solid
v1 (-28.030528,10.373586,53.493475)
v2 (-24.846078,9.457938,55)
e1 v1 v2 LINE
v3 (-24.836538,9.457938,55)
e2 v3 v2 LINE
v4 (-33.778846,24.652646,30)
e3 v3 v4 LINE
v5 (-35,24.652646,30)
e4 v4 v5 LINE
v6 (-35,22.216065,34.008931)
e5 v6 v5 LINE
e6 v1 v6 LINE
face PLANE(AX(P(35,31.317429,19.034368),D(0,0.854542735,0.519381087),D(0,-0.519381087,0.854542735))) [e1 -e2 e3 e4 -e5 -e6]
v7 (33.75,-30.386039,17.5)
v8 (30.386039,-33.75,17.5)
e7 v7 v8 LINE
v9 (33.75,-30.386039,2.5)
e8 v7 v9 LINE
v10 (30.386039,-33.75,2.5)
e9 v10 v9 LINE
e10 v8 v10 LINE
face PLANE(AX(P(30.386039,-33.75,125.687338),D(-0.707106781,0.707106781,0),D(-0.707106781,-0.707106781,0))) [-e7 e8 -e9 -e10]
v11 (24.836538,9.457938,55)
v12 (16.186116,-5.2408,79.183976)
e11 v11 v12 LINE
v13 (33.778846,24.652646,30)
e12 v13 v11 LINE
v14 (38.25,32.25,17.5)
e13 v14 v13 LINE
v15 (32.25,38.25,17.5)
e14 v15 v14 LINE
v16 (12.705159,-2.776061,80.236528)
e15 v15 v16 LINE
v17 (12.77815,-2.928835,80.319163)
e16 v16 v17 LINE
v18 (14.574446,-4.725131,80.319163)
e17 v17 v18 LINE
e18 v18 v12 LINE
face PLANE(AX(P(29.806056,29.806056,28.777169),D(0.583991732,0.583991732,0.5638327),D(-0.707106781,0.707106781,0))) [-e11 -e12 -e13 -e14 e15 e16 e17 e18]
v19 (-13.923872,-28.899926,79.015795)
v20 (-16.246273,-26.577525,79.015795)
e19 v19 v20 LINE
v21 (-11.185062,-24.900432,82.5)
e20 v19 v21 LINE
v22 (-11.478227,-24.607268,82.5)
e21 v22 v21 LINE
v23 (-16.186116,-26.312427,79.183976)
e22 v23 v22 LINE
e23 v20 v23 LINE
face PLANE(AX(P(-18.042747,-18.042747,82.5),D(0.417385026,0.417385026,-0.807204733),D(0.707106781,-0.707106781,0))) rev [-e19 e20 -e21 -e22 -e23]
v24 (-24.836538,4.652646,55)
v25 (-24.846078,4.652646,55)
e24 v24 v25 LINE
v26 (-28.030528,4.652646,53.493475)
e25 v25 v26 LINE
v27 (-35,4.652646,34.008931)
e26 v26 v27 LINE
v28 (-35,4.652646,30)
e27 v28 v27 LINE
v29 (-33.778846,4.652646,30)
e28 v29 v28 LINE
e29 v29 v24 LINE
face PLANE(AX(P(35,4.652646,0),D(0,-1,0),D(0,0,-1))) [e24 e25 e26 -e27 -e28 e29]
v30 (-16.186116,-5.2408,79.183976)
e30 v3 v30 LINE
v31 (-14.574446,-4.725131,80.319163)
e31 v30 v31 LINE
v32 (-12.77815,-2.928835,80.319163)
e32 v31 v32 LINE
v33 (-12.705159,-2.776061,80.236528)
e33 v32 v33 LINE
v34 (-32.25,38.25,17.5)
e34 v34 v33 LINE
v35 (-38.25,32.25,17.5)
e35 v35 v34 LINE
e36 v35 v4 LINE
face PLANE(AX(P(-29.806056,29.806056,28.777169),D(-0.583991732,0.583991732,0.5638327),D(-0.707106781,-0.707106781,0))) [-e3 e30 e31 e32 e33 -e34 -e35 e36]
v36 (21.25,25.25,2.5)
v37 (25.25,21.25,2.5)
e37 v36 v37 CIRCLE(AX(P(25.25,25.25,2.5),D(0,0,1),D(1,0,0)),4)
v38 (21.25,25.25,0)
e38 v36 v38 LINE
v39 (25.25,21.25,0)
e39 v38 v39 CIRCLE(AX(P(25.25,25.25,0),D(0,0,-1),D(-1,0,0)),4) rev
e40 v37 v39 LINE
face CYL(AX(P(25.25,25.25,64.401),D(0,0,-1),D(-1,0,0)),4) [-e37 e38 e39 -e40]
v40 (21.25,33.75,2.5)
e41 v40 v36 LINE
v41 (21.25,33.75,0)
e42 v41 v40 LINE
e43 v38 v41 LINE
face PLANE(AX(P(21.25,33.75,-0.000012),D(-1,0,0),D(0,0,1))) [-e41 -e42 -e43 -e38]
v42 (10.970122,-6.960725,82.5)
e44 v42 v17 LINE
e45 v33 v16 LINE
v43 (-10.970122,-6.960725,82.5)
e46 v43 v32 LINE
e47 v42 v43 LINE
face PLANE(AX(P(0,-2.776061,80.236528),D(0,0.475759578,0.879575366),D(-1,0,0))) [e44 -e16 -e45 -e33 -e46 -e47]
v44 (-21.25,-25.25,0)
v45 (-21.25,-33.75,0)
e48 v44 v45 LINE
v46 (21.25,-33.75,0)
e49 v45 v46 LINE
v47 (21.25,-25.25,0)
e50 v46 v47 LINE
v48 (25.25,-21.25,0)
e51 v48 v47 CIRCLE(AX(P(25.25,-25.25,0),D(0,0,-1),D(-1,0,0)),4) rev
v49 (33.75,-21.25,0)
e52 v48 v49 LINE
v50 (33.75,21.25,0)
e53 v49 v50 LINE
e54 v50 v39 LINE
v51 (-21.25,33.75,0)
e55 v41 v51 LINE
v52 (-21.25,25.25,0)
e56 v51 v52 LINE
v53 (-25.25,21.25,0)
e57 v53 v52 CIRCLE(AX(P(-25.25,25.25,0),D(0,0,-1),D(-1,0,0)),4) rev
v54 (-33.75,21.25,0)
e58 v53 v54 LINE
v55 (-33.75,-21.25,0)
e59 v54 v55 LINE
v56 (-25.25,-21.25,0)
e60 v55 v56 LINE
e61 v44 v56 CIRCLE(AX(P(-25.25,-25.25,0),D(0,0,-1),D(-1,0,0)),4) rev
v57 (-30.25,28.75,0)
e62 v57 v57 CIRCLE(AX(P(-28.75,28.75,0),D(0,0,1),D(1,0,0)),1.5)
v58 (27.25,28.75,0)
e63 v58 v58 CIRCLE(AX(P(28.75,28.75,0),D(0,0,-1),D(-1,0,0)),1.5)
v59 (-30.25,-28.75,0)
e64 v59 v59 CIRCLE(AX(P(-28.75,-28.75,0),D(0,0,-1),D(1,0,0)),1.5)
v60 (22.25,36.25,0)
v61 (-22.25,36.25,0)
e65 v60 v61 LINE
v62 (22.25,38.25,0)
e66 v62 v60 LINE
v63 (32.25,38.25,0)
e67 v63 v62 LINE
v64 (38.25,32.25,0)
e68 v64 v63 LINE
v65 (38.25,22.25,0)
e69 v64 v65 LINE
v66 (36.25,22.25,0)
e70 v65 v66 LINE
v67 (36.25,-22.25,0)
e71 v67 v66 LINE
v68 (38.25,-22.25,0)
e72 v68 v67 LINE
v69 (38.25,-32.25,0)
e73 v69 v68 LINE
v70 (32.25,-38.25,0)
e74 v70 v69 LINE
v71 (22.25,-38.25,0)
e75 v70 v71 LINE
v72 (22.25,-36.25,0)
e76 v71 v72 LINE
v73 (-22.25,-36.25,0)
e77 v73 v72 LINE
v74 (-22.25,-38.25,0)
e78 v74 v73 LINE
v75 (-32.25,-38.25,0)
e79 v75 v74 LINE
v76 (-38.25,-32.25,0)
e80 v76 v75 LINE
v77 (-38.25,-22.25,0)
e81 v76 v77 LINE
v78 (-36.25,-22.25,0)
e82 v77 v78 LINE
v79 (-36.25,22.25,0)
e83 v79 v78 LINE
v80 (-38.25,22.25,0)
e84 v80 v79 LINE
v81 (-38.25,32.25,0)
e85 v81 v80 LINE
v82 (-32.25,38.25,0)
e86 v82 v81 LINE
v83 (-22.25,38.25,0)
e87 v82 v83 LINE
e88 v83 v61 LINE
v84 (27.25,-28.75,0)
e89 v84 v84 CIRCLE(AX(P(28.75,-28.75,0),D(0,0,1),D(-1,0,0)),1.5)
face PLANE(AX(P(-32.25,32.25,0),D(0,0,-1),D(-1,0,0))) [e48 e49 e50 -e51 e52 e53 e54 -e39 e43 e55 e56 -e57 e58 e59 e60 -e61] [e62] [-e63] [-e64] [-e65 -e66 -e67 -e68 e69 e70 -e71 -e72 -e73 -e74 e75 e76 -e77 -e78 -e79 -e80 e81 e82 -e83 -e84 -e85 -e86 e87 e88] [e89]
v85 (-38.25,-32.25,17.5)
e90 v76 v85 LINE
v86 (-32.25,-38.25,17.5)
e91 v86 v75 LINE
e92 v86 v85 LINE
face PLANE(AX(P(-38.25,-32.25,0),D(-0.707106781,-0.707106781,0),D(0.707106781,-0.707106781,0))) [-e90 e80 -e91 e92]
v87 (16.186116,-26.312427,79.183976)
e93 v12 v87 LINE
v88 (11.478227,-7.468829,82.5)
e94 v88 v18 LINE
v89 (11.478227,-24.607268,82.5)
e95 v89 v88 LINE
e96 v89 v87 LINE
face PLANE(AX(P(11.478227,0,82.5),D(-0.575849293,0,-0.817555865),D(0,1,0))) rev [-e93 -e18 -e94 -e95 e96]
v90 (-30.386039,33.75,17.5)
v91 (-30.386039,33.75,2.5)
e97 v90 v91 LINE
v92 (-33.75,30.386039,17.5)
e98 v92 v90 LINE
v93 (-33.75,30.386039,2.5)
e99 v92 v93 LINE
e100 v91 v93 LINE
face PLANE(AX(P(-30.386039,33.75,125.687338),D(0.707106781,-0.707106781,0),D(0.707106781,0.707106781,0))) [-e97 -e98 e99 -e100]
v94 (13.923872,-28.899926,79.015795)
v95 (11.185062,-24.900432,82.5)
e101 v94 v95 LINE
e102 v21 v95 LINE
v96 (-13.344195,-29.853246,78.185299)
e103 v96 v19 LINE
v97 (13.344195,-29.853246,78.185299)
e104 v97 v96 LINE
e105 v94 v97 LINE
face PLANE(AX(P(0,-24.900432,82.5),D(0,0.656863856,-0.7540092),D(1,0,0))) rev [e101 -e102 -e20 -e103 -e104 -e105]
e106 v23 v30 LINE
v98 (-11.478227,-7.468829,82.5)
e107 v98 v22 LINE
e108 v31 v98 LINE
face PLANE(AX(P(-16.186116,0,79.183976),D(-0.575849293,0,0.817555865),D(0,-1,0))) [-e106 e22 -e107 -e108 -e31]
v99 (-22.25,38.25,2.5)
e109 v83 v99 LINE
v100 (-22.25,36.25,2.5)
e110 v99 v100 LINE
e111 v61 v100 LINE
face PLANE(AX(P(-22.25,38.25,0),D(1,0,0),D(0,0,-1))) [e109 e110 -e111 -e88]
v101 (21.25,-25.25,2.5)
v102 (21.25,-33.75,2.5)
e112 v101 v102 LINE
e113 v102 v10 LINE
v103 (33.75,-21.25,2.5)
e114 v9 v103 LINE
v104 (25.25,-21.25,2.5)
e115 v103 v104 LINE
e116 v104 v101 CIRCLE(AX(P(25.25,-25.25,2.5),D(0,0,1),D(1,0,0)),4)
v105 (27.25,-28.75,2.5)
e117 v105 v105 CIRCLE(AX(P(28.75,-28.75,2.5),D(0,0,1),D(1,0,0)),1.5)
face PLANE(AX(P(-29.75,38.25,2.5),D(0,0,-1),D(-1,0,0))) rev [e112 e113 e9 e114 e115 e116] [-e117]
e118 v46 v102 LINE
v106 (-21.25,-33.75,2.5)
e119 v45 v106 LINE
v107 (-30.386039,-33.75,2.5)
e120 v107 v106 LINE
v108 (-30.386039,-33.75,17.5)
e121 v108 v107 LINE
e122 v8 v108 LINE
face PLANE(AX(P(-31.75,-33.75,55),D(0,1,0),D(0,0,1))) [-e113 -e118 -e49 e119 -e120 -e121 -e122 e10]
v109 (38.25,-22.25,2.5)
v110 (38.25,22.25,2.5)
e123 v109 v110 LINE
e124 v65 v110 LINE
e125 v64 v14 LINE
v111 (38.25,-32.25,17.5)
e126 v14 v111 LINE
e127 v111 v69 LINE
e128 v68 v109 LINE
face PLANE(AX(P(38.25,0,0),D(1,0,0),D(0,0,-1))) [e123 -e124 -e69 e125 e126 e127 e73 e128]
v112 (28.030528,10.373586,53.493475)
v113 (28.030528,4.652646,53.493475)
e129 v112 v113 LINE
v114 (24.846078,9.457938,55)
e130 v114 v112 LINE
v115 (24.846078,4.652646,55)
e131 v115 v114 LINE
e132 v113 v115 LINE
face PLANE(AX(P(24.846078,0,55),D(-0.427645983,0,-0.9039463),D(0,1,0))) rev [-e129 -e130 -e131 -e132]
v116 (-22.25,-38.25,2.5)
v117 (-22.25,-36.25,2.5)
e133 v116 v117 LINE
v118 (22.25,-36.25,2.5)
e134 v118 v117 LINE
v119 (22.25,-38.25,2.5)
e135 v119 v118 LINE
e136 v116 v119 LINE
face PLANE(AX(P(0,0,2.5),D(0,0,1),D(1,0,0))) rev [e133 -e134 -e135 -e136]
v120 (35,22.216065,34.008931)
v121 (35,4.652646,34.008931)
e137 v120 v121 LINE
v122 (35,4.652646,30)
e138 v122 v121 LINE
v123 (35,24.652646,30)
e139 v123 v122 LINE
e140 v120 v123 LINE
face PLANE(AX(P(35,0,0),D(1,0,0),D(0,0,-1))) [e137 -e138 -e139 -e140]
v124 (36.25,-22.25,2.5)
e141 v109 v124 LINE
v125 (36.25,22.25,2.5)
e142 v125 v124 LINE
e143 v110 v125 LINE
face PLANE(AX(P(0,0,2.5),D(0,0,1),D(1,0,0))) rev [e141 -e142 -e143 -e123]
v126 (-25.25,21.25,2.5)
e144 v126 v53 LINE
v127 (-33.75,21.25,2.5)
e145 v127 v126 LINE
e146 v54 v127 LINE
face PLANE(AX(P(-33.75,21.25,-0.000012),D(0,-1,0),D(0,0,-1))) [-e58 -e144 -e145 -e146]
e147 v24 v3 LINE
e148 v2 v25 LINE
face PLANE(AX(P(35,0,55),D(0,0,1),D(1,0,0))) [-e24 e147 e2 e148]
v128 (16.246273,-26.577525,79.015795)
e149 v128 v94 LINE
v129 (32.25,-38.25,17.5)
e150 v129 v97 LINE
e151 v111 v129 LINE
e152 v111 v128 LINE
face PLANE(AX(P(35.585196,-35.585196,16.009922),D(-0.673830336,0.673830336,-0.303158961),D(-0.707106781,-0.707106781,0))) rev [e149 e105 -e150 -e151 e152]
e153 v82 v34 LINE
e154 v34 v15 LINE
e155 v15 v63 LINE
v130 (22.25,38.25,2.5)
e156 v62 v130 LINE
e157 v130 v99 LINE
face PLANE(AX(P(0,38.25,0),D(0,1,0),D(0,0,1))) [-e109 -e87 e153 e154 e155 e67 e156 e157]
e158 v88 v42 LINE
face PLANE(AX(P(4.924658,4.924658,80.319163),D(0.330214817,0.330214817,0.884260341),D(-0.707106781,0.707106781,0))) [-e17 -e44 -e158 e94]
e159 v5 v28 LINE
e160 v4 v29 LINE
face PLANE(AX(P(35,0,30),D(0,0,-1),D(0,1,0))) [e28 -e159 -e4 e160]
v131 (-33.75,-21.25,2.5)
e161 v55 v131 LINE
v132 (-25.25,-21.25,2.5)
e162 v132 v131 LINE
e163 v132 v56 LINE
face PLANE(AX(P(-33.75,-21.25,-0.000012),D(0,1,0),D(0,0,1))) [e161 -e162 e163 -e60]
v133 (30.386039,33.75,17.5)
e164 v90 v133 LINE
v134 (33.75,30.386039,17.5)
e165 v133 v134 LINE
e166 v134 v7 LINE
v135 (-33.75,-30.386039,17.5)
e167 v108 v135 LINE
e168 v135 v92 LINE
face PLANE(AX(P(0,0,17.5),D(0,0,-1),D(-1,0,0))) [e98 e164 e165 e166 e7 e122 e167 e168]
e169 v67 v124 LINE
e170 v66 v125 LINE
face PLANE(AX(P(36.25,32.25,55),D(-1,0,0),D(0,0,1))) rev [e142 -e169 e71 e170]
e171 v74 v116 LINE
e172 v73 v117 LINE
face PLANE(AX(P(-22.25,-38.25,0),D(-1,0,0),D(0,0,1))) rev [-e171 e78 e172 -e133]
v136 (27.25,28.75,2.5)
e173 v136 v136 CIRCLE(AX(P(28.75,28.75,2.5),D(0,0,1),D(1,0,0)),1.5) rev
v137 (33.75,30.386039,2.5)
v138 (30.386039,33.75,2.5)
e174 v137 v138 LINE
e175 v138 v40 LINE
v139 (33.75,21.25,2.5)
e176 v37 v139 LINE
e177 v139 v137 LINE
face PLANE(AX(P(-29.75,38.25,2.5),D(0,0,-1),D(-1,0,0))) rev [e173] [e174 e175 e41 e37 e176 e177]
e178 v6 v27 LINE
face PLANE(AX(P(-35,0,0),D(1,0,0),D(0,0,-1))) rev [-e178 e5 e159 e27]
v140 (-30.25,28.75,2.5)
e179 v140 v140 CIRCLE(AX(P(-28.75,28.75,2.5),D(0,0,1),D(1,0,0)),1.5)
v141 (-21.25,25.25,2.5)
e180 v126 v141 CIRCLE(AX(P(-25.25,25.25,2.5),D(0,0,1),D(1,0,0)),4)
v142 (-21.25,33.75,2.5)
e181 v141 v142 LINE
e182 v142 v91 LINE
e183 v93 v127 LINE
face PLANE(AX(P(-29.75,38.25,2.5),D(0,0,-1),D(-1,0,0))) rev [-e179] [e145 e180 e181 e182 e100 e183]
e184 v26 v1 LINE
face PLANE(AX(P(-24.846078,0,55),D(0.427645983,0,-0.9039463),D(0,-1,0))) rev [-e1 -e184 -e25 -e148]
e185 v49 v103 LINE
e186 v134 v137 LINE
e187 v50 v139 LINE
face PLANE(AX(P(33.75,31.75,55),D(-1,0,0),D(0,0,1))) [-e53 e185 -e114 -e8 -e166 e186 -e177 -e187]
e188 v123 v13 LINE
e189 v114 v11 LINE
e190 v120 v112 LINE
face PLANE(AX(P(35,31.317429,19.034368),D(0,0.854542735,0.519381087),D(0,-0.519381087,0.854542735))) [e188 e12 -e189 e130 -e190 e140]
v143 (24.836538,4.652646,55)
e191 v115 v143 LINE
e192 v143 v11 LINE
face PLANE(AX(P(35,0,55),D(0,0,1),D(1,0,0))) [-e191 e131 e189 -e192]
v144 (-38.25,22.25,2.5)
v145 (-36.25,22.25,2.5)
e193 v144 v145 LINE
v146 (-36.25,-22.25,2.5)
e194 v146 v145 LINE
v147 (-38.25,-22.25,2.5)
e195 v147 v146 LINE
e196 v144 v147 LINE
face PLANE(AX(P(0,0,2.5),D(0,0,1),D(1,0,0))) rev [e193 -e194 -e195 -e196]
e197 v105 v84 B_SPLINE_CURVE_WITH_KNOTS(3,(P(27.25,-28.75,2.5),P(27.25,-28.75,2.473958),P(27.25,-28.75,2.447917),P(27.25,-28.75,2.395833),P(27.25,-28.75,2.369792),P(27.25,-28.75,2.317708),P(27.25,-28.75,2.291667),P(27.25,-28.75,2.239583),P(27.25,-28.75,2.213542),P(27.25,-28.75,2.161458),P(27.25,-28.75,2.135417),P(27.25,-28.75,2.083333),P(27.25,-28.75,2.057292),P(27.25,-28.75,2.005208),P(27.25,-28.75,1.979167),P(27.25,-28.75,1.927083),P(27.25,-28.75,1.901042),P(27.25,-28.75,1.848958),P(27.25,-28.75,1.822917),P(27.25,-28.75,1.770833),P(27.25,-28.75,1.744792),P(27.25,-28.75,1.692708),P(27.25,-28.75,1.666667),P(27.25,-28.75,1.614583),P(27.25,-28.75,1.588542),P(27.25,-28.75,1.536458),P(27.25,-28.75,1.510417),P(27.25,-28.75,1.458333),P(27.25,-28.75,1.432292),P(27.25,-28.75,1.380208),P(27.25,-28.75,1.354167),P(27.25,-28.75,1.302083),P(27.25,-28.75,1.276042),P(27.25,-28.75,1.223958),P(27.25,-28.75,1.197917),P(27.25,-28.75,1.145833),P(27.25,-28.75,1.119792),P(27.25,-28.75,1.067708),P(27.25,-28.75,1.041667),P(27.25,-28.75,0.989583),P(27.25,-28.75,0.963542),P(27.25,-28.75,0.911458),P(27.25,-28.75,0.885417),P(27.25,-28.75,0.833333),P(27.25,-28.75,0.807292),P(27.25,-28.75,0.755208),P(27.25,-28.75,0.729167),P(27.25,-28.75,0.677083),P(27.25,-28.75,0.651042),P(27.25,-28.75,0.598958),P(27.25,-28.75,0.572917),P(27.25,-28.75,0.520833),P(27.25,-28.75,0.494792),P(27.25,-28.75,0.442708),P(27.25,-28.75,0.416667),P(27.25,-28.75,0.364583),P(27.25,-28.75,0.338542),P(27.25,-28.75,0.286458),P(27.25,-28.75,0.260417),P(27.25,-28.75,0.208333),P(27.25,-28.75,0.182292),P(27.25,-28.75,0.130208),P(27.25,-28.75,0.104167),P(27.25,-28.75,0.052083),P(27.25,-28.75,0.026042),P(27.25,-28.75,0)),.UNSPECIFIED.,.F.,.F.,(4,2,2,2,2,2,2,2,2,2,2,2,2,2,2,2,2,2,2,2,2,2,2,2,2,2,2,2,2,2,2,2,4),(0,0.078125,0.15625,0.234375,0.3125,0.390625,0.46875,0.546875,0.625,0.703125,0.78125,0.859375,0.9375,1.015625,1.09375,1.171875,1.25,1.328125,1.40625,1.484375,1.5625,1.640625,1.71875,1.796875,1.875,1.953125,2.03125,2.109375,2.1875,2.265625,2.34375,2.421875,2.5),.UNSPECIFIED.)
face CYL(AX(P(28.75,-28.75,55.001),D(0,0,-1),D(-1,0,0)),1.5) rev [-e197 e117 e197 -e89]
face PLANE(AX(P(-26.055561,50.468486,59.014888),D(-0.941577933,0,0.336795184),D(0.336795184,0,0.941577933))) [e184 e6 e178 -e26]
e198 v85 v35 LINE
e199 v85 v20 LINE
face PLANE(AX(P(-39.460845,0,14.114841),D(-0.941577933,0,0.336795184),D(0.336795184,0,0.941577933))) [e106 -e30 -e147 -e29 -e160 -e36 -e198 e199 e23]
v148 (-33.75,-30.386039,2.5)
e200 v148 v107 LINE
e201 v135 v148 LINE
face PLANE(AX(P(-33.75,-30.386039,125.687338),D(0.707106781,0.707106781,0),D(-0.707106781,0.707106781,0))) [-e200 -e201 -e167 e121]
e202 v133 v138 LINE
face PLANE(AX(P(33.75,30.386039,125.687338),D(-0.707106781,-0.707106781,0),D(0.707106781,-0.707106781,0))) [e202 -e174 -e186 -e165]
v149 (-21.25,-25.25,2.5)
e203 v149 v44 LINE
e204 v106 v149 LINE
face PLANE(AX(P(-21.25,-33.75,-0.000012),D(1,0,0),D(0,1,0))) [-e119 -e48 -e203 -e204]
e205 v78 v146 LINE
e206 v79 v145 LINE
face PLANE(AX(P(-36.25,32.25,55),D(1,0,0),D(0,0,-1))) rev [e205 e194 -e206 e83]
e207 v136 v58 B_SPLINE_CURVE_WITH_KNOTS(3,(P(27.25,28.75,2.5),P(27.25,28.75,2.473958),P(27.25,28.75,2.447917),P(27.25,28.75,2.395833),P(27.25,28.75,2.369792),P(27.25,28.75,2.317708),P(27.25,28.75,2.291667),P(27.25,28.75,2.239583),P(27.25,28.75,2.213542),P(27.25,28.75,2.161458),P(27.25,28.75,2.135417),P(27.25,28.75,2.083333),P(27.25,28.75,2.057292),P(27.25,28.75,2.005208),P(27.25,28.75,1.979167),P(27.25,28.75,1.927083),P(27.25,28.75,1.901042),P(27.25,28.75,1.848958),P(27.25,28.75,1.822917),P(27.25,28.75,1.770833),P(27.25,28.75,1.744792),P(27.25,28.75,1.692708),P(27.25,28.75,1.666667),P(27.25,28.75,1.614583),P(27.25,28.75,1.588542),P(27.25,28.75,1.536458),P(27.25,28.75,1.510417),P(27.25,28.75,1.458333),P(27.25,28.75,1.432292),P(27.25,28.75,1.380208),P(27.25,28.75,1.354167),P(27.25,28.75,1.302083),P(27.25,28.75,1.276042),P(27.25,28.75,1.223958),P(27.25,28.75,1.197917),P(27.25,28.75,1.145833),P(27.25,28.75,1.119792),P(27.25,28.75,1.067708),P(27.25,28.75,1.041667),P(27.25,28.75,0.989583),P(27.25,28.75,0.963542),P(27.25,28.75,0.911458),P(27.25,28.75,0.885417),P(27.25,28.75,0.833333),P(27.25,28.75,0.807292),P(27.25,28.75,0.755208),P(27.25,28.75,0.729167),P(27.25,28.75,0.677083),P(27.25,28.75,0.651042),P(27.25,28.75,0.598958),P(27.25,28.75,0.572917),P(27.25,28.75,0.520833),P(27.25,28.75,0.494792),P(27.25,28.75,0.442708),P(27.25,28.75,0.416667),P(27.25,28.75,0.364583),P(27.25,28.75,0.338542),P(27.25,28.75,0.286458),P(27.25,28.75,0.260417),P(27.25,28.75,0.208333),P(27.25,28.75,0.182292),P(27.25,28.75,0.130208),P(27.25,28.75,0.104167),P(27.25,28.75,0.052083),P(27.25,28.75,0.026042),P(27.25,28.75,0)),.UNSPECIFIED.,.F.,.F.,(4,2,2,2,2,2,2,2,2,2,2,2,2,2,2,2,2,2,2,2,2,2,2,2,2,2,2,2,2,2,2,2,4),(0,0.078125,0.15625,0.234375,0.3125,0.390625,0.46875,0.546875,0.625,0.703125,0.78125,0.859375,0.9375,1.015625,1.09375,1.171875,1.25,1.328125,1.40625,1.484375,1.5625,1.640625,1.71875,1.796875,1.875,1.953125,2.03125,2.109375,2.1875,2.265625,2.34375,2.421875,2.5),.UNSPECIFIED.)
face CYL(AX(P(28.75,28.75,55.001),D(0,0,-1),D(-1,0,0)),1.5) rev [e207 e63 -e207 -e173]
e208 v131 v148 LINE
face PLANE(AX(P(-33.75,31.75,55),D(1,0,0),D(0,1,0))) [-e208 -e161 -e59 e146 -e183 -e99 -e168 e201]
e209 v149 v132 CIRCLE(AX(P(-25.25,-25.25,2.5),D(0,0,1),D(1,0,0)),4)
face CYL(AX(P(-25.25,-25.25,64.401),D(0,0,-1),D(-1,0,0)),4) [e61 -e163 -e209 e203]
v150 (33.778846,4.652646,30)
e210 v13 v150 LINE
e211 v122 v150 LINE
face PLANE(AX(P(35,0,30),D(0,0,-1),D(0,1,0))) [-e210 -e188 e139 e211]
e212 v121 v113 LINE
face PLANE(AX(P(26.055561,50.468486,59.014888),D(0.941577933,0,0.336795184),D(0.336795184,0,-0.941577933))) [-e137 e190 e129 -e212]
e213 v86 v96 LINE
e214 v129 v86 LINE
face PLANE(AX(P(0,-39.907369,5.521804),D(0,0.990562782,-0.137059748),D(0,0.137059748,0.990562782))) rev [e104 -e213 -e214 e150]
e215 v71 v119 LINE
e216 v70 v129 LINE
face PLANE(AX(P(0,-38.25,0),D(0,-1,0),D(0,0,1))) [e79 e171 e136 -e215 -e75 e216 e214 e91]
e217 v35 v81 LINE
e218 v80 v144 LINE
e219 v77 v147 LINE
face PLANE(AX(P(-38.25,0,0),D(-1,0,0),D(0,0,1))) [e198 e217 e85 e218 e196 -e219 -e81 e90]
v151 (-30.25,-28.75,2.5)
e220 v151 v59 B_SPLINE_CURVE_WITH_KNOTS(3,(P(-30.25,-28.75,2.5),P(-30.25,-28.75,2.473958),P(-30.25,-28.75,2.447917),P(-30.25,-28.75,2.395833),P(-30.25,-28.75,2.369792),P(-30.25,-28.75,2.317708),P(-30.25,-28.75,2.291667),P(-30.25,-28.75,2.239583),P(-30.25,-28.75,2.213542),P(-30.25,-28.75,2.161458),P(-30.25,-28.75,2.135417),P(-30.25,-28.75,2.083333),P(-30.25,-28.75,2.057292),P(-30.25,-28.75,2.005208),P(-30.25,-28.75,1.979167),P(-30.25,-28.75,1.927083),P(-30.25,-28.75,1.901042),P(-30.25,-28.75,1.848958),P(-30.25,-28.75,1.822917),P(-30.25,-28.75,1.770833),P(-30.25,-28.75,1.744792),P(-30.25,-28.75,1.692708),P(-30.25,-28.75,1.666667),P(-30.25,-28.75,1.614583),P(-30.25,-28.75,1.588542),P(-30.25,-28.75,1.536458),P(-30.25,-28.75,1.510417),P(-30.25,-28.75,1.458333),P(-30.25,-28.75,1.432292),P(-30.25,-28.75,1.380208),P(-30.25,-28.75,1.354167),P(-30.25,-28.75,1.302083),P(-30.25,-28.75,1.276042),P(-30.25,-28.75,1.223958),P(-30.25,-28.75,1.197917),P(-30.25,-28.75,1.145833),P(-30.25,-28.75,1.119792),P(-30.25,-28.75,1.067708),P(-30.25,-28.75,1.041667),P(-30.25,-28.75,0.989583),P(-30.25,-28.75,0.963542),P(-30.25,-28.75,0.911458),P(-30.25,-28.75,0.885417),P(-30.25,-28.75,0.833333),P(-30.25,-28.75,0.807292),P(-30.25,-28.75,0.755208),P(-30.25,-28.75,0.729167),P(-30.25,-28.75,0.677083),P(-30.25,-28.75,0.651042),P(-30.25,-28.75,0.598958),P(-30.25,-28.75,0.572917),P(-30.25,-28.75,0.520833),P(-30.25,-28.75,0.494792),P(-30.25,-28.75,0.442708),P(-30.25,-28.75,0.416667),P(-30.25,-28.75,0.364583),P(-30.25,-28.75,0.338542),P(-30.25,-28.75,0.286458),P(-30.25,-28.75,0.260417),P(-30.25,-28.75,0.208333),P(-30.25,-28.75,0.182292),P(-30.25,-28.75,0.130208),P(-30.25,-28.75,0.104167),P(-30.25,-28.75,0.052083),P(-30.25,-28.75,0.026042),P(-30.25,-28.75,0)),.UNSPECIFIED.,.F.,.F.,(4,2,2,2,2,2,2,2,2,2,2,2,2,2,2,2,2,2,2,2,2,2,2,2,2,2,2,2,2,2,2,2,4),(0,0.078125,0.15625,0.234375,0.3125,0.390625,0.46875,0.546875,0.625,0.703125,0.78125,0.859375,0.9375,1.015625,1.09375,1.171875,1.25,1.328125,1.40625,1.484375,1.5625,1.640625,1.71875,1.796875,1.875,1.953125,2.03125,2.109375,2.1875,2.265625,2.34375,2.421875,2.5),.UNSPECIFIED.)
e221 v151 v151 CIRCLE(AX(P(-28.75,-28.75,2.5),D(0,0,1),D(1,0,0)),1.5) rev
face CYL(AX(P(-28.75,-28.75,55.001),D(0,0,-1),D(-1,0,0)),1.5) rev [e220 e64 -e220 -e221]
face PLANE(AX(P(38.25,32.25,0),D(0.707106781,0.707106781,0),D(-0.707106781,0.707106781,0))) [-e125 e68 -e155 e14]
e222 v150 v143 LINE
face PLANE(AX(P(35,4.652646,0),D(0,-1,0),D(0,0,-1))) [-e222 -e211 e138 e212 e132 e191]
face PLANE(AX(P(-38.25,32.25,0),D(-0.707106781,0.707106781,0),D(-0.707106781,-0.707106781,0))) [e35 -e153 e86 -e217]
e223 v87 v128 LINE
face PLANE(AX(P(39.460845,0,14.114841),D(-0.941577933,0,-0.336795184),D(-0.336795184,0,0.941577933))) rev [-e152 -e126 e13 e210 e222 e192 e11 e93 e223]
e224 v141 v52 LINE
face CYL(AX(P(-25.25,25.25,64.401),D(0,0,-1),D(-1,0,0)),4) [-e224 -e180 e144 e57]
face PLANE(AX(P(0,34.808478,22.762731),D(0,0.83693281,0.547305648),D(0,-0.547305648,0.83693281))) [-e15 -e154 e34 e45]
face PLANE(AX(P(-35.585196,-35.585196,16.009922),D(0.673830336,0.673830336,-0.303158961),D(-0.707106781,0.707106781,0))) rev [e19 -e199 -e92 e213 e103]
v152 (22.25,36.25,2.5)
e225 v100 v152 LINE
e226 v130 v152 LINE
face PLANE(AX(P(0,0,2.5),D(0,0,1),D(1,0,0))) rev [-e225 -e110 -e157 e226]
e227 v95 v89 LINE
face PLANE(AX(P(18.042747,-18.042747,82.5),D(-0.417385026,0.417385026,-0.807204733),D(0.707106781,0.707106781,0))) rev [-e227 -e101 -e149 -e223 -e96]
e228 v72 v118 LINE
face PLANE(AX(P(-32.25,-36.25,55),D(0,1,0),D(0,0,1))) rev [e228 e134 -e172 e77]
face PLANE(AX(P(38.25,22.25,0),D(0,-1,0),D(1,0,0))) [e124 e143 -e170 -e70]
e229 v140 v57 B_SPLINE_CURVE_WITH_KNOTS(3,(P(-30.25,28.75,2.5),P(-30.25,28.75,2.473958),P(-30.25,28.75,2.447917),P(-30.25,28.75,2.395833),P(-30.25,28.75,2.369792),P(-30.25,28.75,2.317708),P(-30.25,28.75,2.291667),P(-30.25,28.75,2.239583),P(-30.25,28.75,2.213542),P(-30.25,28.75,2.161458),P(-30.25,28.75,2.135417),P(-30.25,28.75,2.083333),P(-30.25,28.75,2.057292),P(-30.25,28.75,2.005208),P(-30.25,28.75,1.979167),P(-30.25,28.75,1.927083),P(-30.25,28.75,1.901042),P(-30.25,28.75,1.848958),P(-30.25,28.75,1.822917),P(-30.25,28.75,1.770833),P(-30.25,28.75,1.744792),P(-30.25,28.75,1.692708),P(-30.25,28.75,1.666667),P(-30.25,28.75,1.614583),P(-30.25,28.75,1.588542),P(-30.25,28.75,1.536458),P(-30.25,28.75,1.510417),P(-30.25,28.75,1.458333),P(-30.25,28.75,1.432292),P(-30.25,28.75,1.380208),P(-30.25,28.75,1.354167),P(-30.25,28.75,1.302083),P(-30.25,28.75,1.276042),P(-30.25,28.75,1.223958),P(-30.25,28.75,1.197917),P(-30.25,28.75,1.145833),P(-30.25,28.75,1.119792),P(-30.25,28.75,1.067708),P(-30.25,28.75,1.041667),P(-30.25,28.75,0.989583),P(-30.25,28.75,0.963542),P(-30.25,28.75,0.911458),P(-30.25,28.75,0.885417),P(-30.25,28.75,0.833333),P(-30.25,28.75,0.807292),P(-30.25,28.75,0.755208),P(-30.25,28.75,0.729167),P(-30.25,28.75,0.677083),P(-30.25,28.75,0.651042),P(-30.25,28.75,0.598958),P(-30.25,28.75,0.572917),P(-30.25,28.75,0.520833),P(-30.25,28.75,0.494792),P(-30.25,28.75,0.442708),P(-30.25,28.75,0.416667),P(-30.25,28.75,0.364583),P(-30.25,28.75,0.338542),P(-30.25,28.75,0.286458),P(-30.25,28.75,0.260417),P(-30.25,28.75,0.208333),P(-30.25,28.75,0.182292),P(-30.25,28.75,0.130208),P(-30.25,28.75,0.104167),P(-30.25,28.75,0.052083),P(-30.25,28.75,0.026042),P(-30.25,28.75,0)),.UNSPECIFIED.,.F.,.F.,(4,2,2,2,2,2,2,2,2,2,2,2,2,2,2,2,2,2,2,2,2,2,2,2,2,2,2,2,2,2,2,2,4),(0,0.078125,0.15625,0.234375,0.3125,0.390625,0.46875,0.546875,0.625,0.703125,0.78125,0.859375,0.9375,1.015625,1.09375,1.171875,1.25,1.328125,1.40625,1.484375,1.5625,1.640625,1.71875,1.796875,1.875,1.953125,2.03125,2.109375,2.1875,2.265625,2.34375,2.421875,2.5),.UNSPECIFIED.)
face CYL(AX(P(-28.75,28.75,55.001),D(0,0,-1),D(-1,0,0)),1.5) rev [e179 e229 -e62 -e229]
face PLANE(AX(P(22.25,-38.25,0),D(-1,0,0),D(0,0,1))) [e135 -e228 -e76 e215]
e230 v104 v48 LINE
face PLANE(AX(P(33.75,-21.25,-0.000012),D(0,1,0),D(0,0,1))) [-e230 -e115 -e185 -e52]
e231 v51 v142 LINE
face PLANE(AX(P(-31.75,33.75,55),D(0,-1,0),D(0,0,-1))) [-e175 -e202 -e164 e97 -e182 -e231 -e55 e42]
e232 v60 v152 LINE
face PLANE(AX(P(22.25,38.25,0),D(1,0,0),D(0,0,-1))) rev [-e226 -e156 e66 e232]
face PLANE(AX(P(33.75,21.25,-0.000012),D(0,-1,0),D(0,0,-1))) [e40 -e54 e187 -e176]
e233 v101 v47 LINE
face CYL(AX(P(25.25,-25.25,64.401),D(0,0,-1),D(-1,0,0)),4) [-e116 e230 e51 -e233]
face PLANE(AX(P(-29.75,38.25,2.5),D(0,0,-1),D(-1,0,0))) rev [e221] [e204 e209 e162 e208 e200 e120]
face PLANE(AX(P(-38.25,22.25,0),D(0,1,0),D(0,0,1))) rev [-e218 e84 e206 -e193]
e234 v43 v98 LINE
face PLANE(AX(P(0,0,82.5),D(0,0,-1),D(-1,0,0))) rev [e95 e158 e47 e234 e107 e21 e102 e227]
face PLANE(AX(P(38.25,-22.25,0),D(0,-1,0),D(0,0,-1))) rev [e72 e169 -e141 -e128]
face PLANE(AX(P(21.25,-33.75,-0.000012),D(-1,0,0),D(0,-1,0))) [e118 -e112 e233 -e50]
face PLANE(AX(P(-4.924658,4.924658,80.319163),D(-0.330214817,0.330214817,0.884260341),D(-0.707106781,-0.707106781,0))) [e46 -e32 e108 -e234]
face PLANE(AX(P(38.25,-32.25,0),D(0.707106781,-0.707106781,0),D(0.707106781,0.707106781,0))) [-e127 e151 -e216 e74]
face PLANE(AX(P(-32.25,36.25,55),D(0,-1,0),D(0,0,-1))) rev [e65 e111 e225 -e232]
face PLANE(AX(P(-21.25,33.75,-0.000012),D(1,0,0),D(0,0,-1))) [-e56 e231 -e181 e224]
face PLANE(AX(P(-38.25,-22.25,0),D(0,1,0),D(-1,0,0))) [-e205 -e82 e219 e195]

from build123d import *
from OCP.BRepFilletAPI import BRepFilletAPI_MakeChamfer

# Parameters (mm, degrees)
BOSS_EXTRUDE1_DEPTH            = 55
SKETCH2_W                      = 67.5
SKETCH2_H                      = 67.5
BOSS_EXTRUDE2_DEPTH            = 2.5
CUT_EXTRUDE1_REACH             = 75.378
SKETCH3_W                      = 16.5
SKETCH3_H                      = 7
SKETCH3_W_2                    = 8
SKETCH3_H_2                    = 16
FILLET1_R                      = 1
CUT_EXTRUDE2_REACH             = 77.187
SKETCH4_R                      = 1.5
MIRROR2_COPY_1_REACH           = 77.187
MIRROR2_COPY_1_SKETCH_R        = 1.5
BOSS_EXTRUDE3_DEPTH            = 16.09
BOSS_EXTRUDE3_DEPTH_BACK       = 23.81
BOSS_EXTRUDE4_DEPTH            = 47
SKETCH7_W                      = 39.9
SKETCH7_H                      = 19.5
CUT_EXTRUDE3_DEPTH             = 9.4
BOSS_EXTRUDE7_DEPTH            = 2
CUT_EXTRUDE6_REACH             = 85.213
CUT_EXTRUDE6_DIRECTION_2_DEPTH = 84.213490493
CUT_EXTRUDE7_REACH             = 74.438
SKETCH14_W                     = 14.7
SKETCH14_H                     = 2
CUT_EXTRUDE8_DEPTH             = 104.526192338
CUT_EXTRUDE8_DEPTH_BACK        = 2.5
SKETCH15_R                     = 1.6
SKETCH16_W                     = 7.5
SKETCH16_H                     = 2.5
BOSS_EXTRUDE8_DEPTH            = 7
CUT_EXTRUDE5_DEPTH             = 2
CUT_EXTRUDE9_REACH             = 74.438
SKETCH17_R                     = 1
SKETCH19_R                     = 3
CUT_EXTRUDE10_DEPTH            = 2.5
BOSS_EXTRUDE9_DEPTH            = 2
CIRPATTERN1_COUNT              = 4
CIRPATTERN2_COUNT              = 4
CUT_EXTRUDE11_DEPTH            = 2.5
BOSS_EXTRUDE12_DEPTH           = 55
CUT_EXTRUDE12_DEPTH            = 85.104012984
CUT_EXTRUDE12_DEPTH_BACK       = 85.104012984
SKETCH23_W                     = 53.743256412
SKETCH23_H                     = 84.17088144
BOSS_EXTRUDE13_DEPTH           = 15
BOSS_EXTRUDE14_DEPTH           = 35
BOSS_EXTRUDE14_DEPTH_BACK      = 35
CUT_EXTRUDE13_REACH            = 94.676
CHAMFER2_SIZE                  = 1.6
CHAMFER2_SIZE2                 = 2.645578105


with BuildPart() as part:
    # Sketch1 → Boss-Extrude1 (new body)
    with BuildSketch(Plane.XY):
        with BuildLine():
            Line((-36.25, 32.25), (-36.25, -32.25))
            ThreePointArc((-36.25, -32.25), (-35.078427125, -35.078427125), (-32.25, -36.25))
            Line((-32.25, -36.25), (32.25, -36.25))
            ThreePointArc((32.25, -36.25), (35.078427125, -35.078427125), (36.25, -32.25))
            Line((36.25, -32.25), (36.25, 32.25))
            ThreePointArc((36.25, 32.25), (35.078427125, 35.078427125), (32.25, 36.25))
            Line((32.25, 36.25), (-32.25, 36.25))
            ThreePointArc((-32.25, 36.25), (-35.078427125, 35.078427125), (-36.25, 32.25))
        make_face()
        with BuildLine():
            Line((-31.75, 33.75), (31.75, 33.75))
            ThreePointArc((31.75, 33.75), (33.164213562, 33.164213562), (33.75, 31.75))
            Line((33.75, 31.75), (33.75, -31.75))
            ThreePointArc((33.75, -31.75), (33.164213562, -33.164213562), (31.75, -33.75))
            Line((31.75, -33.75), (-31.75, -33.75))
            ThreePointArc((-31.75, -33.75), (-33.164213562, -33.164213562), (-33.75, -31.75))
            Line((-33.75, -31.75), (-33.75, 31.75))
            ThreePointArc((-33.75, 31.75), (-33.164213562, 33.164213562), (-31.75, 33.75))
        make_face(mode=Mode.SUBTRACT)
    extrude(amount=BOSS_EXTRUDE1_DEPTH)

    # Sketch2 → Boss-Extrude2 (add)
    with BuildSketch(Plane.XY):
        Rectangle(SKETCH2_W, SKETCH2_H)
    extrude(amount=BOSS_EXTRUDE2_DEPTH)

    # Sketch3 → Cut-Extrude1 (cut, up to next)
    with BuildSketch(Plane.XY.offset(2.5), mode=Mode.PRIVATE) as cut_extrude1_sk1:
        with Locations((-11.63, 14.79)):
            Rectangle(SKETCH3_W, SKETCH3_H)
    cut_extrude1_tool1 = extrude(cut_extrude1_sk1.sketch, amount=-CUT_EXTRUDE1_REACH, mode=Mode.PRIVATE) & part.part
    # Sketch3 → Cut-Extrude1 (cut, up to next)
    with BuildSketch(Plane.XY.offset(2.5), mode=Mode.PRIVATE) as cut_extrude1_sk2:
        Rectangle(SKETCH3_W_2, SKETCH3_H_2)
    cut_extrude1_tool2 = extrude(cut_extrude1_sk2.sketch, amount=-CUT_EXTRUDE1_REACH, mode=Mode.PRIVATE) & part.part
    add(cut_extrude1_tool1.solids().sort_by_distance((-11.63, 14.79, 2.5))[0], mode=Mode.SUBTRACT)
    add(cut_extrude1_tool2.solids().sort_by_distance((0, 0, 2.5))[0], mode=Mode.SUBTRACT)

    # Fillet1
    fillet1_edges = [part.edges().sort_by_distance(p)[0] for p in [
        (-19.88, 11.29, 1.25),
        (-19.88, 18.29, 1.25),
        (-3.38, 18.29, 1.25),
        (-3.38, 11.29, 1.25),
        (4, -8, 1.25),
        (-4, -8, 1.25),
        (-4, 8, 1.25),
        (4, 8, 1.25),
    ]]
    fillet(fillet1_edges, radius=FILLET1_R)

    # Sketch4 → Cut-Extrude2 (cut, up to next)
    with BuildSketch(Plane(origin=(0, 0, 0), x_dir=(-1, 0, 0), z_dir=(0, 0, -1)), mode=Mode.PRIVATE) as cut_extrude2_sk1:
        with Locations((-28.75, 28.75)):
            Circle(SKETCH4_R)
    cut_extrude2_tool1 = extrude(cut_extrude2_sk1.sketch, amount=-CUT_EXTRUDE2_REACH, mode=Mode.PRIVATE) & part.part
    cut_extrude2 = cut_extrude2_tool1.solids().sort_by_distance((28.75, 28.75, 0))[0]
    add(cut_extrude2, mode=Mode.SUBTRACT)

    # Mirror1: Cut-Extrude2 across plane
    add(cut_extrude2.mirror(Plane(origin=(0, 0, 0), x_dir=(0, 0, 1), z_dir=(1, 0, 0))), mode=Mode.SUBTRACT)

    # Mirror2: Cut-Extrude2 across plane
    add(cut_extrude2.mirror(Plane.ZX), mode=Mode.SUBTRACT)

    # Mirror2 copy 1 sketch → Mirror2 copy 1 (cut, up to next)
    with BuildSketch(Plane(origin=(0, 0, 0), x_dir=(1, 0, 0), z_dir=(0, 0, -1)), mode=Mode.PRIVATE) as mirror2_copy_1_sk1:
        with Locations((-28.75, 28.75)):
            Circle(MIRROR2_COPY_1_SKETCH_R)
    mirror2_copy_1_tool1 = extrude(mirror2_copy_1_sk1.sketch, amount=-MIRROR2_COPY_1_REACH, mode=Mode.PRIVATE) & part.part
    add(mirror2_copy_1_tool1.solids().sort_by_distance((-28.75, -28.75, 0))[0], mode=Mode.SUBTRACT)



with BuildPart() as body_2:
    # Sketch5 → Boss-Extrude3 (new, two sides: drawn at the far end of the back side and taken through both)
    with BuildSketch(Plane(origin=(0, 0, 0), x_dir=(0, 0, -1), z_dir=(1, 0, 0)).offset(-BOSS_EXTRUDE3_DEPTH_BACK)):
        Polygon((-14.7, 14), (-64.4, 14), (-64.4, 12), (-62.4, 12), (-16.7, 12), (-16.7, -12), (-62.4, -12), (-64.4, -12), (-64.4, -14), (-14.7, -14), align=None)
    extrude(amount=BOSS_EXTRUDE3_DEPTH + BOSS_EXTRUDE3_DEPTH_BACK)


with BuildPart() as part_1:
    add(part.part)

    add(body_2.part)  # Boss-Extrude4 merges body 2
    # Sketch6 → Boss-Extrude4 (add)
    with BuildSketch(Plane.XY.offset(64.4)):
        Polygon((-23.81, -14), (16.09, -14), (16.09, -16.5), (-2.11, -16.5), (-2.11, -31.25), (16.09, -31.25), (16.09, -33.75), (-23.81, -33.75), (-23.81, -31.25), (-5.61, -31.25), (-5.61, -16.5), (-23.81, -16.5), align=None)
    extrude(amount=-BOSS_EXTRUDE4_DEPTH)

    # Sketch7 → Cut-Extrude3 (cut)
    with BuildSketch(Plane.XY.offset(64.4)):
        with Locations((-3.86, -24)):
            Rectangle(SKETCH7_W, SKETCH7_H)
    extrude(amount=-CUT_EXTRUDE3_DEPTH, mode=Mode.SUBTRACT)

    # Sketch12 → Boss-Extrude7 (add)
    with BuildSketch(Plane(origin=(0, 36.25, 0), x_dir=(1, 0, 0), z_dir=(0, 1, 0))):
        Polygon((29.75, -55), (32.25, -55), (32.25, -52.5), (32.25, -45), (29.75, -45), (29.75, -52.5), (22.25, -52.5), (22.25, -55), align=None)
        Polygon((-32.25, 0), (-32.25, -10), (-29.75, -10), (-29.75, -2.5), (-22.25, -2.5), (-22.25, 0), align=None)
    boss_extrude7 = extrude(amount=BOSS_EXTRUDE7_DEPTH)

    # Sketch13 → Cut-Extrude6 (cut, up to next)
    with BuildSketch(Plane(origin=(0, 0, 0), x_dir=(-1, 0, 0), z_dir=(0, 0, -1)), mode=Mode.PRIVATE) as cut_extrude6_sk1:
        with BuildLine():
            Line((-33.75, 21.25), (-25.25, 21.25))
            ThreePointArc((-25.25, 21.25), (-22.421572875, 22.421572875), (-21.25, 25.25))
            Line((-21.25, 25.25), (-21.25, 33.75))
            Line((-21.25, 33.75), (21.25, 33.75))
            Line((21.25, 33.75), (21.25, 25.25))
            ThreePointArc((21.25, 25.25), (22.421572875, 22.421572875), (25.25, 21.25))
            Line((25.25, 21.25), (33.75, 21.25))
            Line((33.75, 21.25), (33.75, -21.25))
            Line((33.75, -21.25), (25.25, -21.25))
            ThreePointArc((25.25, -21.25), (22.421572875, -22.421572875), (21.25, -25.25))
            Line((21.25, -25.25), (21.25, -33.75))
            Line((21.25, -33.75), (-21.25, -33.75))
            Line((-21.25, -33.75), (-21.25, -25.25))
            ThreePointArc((-21.25, -25.25), (-22.421572875, -22.421572875), (-25.25, -21.25))
            Line((-25.25, -21.25), (-33.75, -21.25))
            Line((-33.75, -21.25), (-33.75, 21.25))
        make_face()
    cut_extrude6_tool1 = extrude(cut_extrude6_sk1.sketch, amount=-CUT_EXTRUDE6_REACH, mode=Mode.PRIVATE) & part_1.part
    add(cut_extrude6_tool1.solids().sort_by_distance((0, 0, 0))[0], mode=Mode.SUBTRACT)

    # Sketch13 → Cut-Extrude6 direction 2 (cut)
    with BuildSketch(Plane(origin=(0, 0, 0), x_dir=(-1, 0, 0), z_dir=(0, 0, -1))):
        with BuildLine():
            Line((-33.75, 21.25), (-25.25, 21.25))
            ThreePointArc((-25.25, 21.25), (-22.421572875, 22.421572875), (-21.25, 25.25))
            Line((-21.25, 25.25), (-21.25, 33.75))
            Line((-21.25, 33.75), (21.25, 33.75))
            Line((21.25, 33.75), (21.25, 25.25))
            ThreePointArc((21.25, 25.25), (22.421572875, 22.421572875), (25.25, 21.25))
            Line((25.25, 21.25), (33.75, 21.25))
            Line((33.75, 21.25), (33.75, -21.25))
            Line((33.75, -21.25), (25.25, -21.25))
            ThreePointArc((25.25, -21.25), (22.421572875, -22.421572875), (21.25, -25.25))
            Line((21.25, -25.25), (21.25, -33.75))
            Line((21.25, -33.75), (-21.25, -33.75))
            Line((-21.25, -33.75), (-21.25, -25.25))
            ThreePointArc((-21.25, -25.25), (-22.421572875, -22.421572875), (-25.25, -21.25))
            Line((-25.25, -21.25), (-33.75, -21.25))
            Line((-33.75, -21.25), (-33.75, 21.25))
        make_face()
    extrude(amount=CUT_EXTRUDE6_DIRECTION_2_DEPTH, mode=Mode.SUBTRACT)

    # Sketch14 → Cut-Extrude7 (cut, up to next)
    with BuildSketch(Plane(origin=(0, 0, 14.7), x_dir=(-1, 0, 0), z_dir=(0, 0, -1)), mode=Mode.PRIVATE) as cut_extrude7_sk1:
        with Locations((16.46, 13)):
            Rectangle(SKETCH14_W, SKETCH14_H)
    cut_extrude7_tool1 = extrude(cut_extrude7_sk1.sketch, amount=-CUT_EXTRUDE7_REACH, mode=Mode.PRIVATE) & part_1.part
    add(cut_extrude7_tool1.solids().sort_by_distance((-16.46, 13, 14.7))[0], mode=Mode.SUBTRACT)

    # Sketch15 → Cut-Extrude8 (cut, two sides: drawn at the far end of the back side and taken through both)
    with BuildSketch(Plane(origin=(0, 36.25, 0), x_dir=(1, 0, 0), z_dir=(0, 1, 0)).offset(-CUT_EXTRUDE8_DEPTH_BACK)):
        with Locations(Location((3.25, -45, 0), (0, 0, 90))):
            Circle(SKETCH15_R)
    extrude(amount=CUT_EXTRUDE8_DEPTH + CUT_EXTRUDE8_DEPTH_BACK, mode=Mode.SUBTRACT)

    # Sketch16 → Boss-Extrude8 (add)
    with BuildSketch(Plane(origin=(-33.75, 0, 0), x_dir=(0, 0, -1), z_dir=(1, 0, 0))):
        with Locations((-12.25, 30.9)):
            Rectangle(SKETCH16_W, SKETCH16_H)
    extrude(amount=BOSS_EXTRUDE8_DEPTH)

    # Sketch11 → Cut-Extrude5 (cut)
    with BuildSketch(Plane(origin=(0, 14, 0), x_dir=(1, 0, 0), z_dir=(0, 1, 0))):
        Polygon((1.19, -39.55), (12.59, -39.55), (12.59, -14.7), (16.09, -14.7), (16.09, -64.4), (12.59, -64.4), (1.19, -64.4), (-23.81, -64.4), (-23.81, -14.7), (1.19, -14.7), align=None)
    extrude(amount=-CUT_EXTRUDE5_DEPTH, mode=Mode.SUBTRACT)

    # Sketch17 → Cut-Extrude9 (cut, up to next)
    with BuildSketch(Plane(origin=(0, 0, 14.7), x_dir=(-1, 0, 0), z_dir=(0, 0, -1)), mode=Mode.PRIVATE) as cut_extrude9_sk1:
        with Locations(Location((-13.59, 9, 0), (0, 0, 90))):
            Circle(SKETCH17_R)
    cut_extrude9_tool1 = extrude(cut_extrude9_sk1.sketch, amount=-CUT_EXTRUDE9_REACH, mode=Mode.PRIVATE) & part_1.part
    # Sketch17 → Cut-Extrude9 (cut, up to next)
    with BuildSketch(Plane(origin=(0, 0, 14.7), x_dir=(-1, 0, 0), z_dir=(0, 0, -1)), mode=Mode.PRIVATE) as cut_extrude9_sk2:
        with Locations(Location((-13.59, -9, 0), (0, 0, 90))):
            Circle(SKETCH17_R)
    cut_extrude9_tool2 = extrude(cut_extrude9_sk2.sketch, amount=-CUT_EXTRUDE9_REACH, mode=Mode.PRIVATE) & part_1.part
    # Sketch17 → Cut-Extrude9 (cut, up to next)
    with BuildSketch(Plane(origin=(0, 0, 14.7), x_dir=(-1, 0, 0), z_dir=(0, 0, -1)), mode=Mode.PRIVATE) as cut_extrude9_sk3:
        with Locations(Location((21.31, -9, 0), (0, 0, 90))):
            Circle(SKETCH17_R)
    cut_extrude9_tool3 = extrude(cut_extrude9_sk3.sketch, amount=-CUT_EXTRUDE9_REACH, mode=Mode.PRIVATE) & part_1.part
    add(cut_extrude9_tool1.solids().sort_by_distance((13.59, 9, 14.7))[0], mode=Mode.SUBTRACT)
    add(cut_extrude9_tool2.solids().sort_by_distance((13.59, -9, 14.7))[0], mode=Mode.SUBTRACT)
    add(cut_extrude9_tool3.solids().sort_by_distance((-21.31, -9, 14.7))[0], mode=Mode.SUBTRACT)

    # Sketch19 → Cut-Extrude10 (cut)
    with BuildSketch(Plane(origin=(0, 36.25, 0), x_dir=(1, 0, 0), z_dir=(0, 1, 0))):
        with Locations(Location((0, -27.5, 0), (0, 0, 270))):
            Circle(SKETCH19_R)
    cut_extrude10 = extrude(amount=-CUT_EXTRUDE10_DEPTH, mode=Mode.SUBTRACT)

    # Sketch20 → Boss-Extrude9 (add)
    with BuildSketch(Plane(origin=(36.25, 0, -36.25), x_dir=(0, 0, 1), z_dir=(-1, 0, 0))):
        Polygon((91.25, 32.25), (81.25, 32.25), (81.25, 29.75), (88.75, 29.75), (88.75, 22.25), (91.25, 22.25), align=None)
        Polygon((36.25, -22.25), (36.25, -32.25), (46.25, -32.25), (46.25, -29.75), (38.75, -29.75), (38.75, -22.25), align=None)
    boss_extrude9 = extrude(amount=-BOSS_EXTRUDE9_DEPTH)

    # CirPattern1: Boss-Extrude7, Cut-Extrude10 ×4 about axis
    cirpattern1_axis = Axis((0, 0, 0), (0, 0, 1))
    add([boss_extrude7.rotate(cirpattern1_axis, i * 360 / CIRPATTERN1_COUNT) for i in range(1, CIRPATTERN1_COUNT)])
    add([cut_extrude10.rotate(cirpattern1_axis, i * 360 / CIRPATTERN1_COUNT) for i in range(1, CIRPATTERN1_COUNT)], mode=Mode.SUBTRACT)

    # CirPattern2: Boss-Extrude9 ×4 about axis
    cirpattern2_axis = Axis((0, 0, 0), (0, 0, 1))
    for i in range(1, CIRPATTERN2_COUNT):
        add(boss_extrude9.rotate(cirpattern2_axis, i * 360 / CIRPATTERN2_COUNT))

    # Sketch21 → Cut-Extrude11 (cut)
    with BuildSketch(Plane.XZ.offset(33.75)):
        with BuildLine():
            Line((-2.11, 25.367419404), (-2.11, 29.632580596))
            ThreePointArc((-2.11, 29.632580596), (3, 27.5), (-2.11, 25.367419404))
        make_face()
    extrude(amount=-CUT_EXTRUDE11_DEPTH, mode=Mode.SUBTRACT)

    # Sketch22 → Boss-Extrude12 (add, through all)
    with BuildSketch(Plane.XY.offset(55)):
        Polygon((-38.25, 32.25), (-32.25, 38.25), (-29.75, 38.25), (-29.75, 33.75), (-33.75, 33.75), (-33.75, 29.75), (-38.25, 29.75), align=None)
        Polygon((33.75, 33.75), (33.75, 29.75), (38.25, 29.75), (38.25, 32.25), (32.25, 38.25), (29.75, 38.25), (29.75, 33.75), align=None)
        Polygon((38.25, -32.25), (32.25, -38.25), (29.75, -38.25), (29.75, -33.75), (33.75, -33.75), (33.75, -29.75), (38.25, -29.75), align=None)
        Polygon((-33.75, -33.75), (-33.75, -29.75), (-38.25, -29.75), (-38.25, -32.25), (-32.25, -38.25), (-29.75, -38.25), (-29.75, -33.75), align=None)
    extrude(amount=-BOSS_EXTRUDE12_DEPTH)

    # Sketch23 → Cut-Extrude12 (cut, two sides: drawn at the far end of the back side and taken through both)
    with BuildSketch(Plane(origin=(0, 0, 0), x_dir=(0, 0, -1), z_dir=(1, 0, 0)).offset(-CUT_EXTRUDE12_DEPTH_BACK)):
        with Locations((-29.371628206, -1.519752026)):
            Rectangle(SKETCH23_W, SKETCH23_H)
    extrude(amount=CUT_EXTRUDE12_DEPTH + CUT_EXTRUDE12_DEPTH_BACK, mode=Mode.SUBTRACT)


with BuildPart() as body_2_2:
    # of the pieces the cut leaves, the one that is kept (cut_extrude12_keep)
    add(part_1.part.solids().sort_by_distance((-36.25, 22.25, 0))[0])



with BuildPart() as body_2_3:
    # Loft1: read off the stored shape, not the designer's step
    # Loft1: loft between two sections, ruled curve by curve
    loft1_from = [
        Edge.make_line((-15, -26.256240287, 82.5), (-15, -7.256240287, 82.5)),
        Edge.make_line((-15, -7.256240287, 82.5), (-12, -4.256240287, 82.5)),
        Edge.make_line((-12, -29.256240287, 82.5), (-15, -26.256240287, 82.5)),
        Edge.make_line((12, -29.256240287, 82.5), (-12, -29.256240287, 82.5)),
        Edge.make_line((15, -26.256240287, 82.5), (12, -29.256240287, 82.5)),
        Edge.make_line((15, -7.256240287, 82.5), (15, -26.256240287, 82.5)),
        Edge.make_line((12, -4.256240287, 82.5), (15, -7.256240287, 82.5)),
        Edge.make_line((-12, -4.256240287, 82.5), (12, -4.256240287, 82.5)),
    ]
    loft1_to = [
        Edge.make_line((-38.25, -32.25, 17.5), (-38.25, 32.25, 17.5)),
        Edge.make_line((-38.25, 32.25, 17.5), (-32.25, 38.25, 17.5)),
        Edge.make_line((-32.25, -38.25, 17.5), (-38.25, -32.25, 17.5)),
        Edge.make_line((32.25, -38.25, 17.5), (-32.25, -38.25, 17.5)),
        Edge.make_line((38.25, -32.25, 17.5), (32.25, -38.25, 17.5)),
        Edge.make_line((38.25, 32.25, 17.5), (38.25, -32.25, 17.5)),
        Edge.make_line((32.25, 38.25, 17.5), (38.25, 32.25, 17.5)),
        Edge.make_line((-32.25, 38.25, 17.5), (32.25, 38.25, 17.5)),
    ]
    loft1 = Solid(Shell([*[Face.make_surface_from_curves(loft1_from[k], loft1_to[k]) for k in range(8)], Face(Wire(loft1_from)), Face(Wire(loft1_to))]))
    add(loft1)


with BuildPart() as body_2_2_1:
    add(body_2_2.part)

    add(body_2_3.part)  # Boss-Extrude13 merges body 2 3
    # Sketch29 → Boss-Extrude13 (add)
    with BuildSketch(Plane.XY.offset(2.5)):
        Polygon((-38.25, -32.25), (-32.25, -38.25), (32.25, -38.25), (38.25, -32.25), (38.25, 32.25), (32.25, 38.25), (-32.25, 38.25), (-38.25, 32.25), align=None)
        Polygon((-33.75, -30.386038969), (-30.386038969, -33.75), (30.386038969, -33.75), (33.75, -30.386038969), (33.75, 30.386038969), (30.386038969, 33.75), (-30.386038969, 33.75), (-33.75, 30.386038969), align=None, mode=Mode.SUBTRACT)
    extrude(amount=BOSS_EXTRUDE13_DEPTH)

    # Sketch30 → Boss-Extrude14 (add, two sides: drawn at the far end of the back side and taken through both)
    with BuildSketch(Plane.ZY.offset(-BOSS_EXTRUDE14_DEPTH_BACK)):
        Polygon((55, 4.652646099), (55, 9.457938296), (30, 24.652646099), (30, 4.652646099), align=None)
    extrude(amount=BOSS_EXTRUDE14_DEPTH + BOSS_EXTRUDE14_DEPTH_BACK)

    # Cut-Extrude13: up to this plane
    cut_extrude13_end = Plane(origin=(35, 31.317429352, 19.034367525), z_dir=(0, 0.8545427354341548, 0.5193810867914928))
    # Sketch31 → Cut-Extrude13 (cut, up to the surface)
    with BuildSketch(Plane(origin=(0, 0, 7.249003184), x_dir=(1, 0, 0), z_dir=(0, 1, 0)), mode=Mode.PRIVATE) as cut_extrude13_sk1:
        Polygon((26.055561267, -51.765885066), (36.727591717, -21.930101014), (36.727591717, -51.765885066), align=None)
    cut_extrude13_tool1 = split(extrude(cut_extrude13_sk1.sketch, amount=CUT_EXTRUDE13_REACH, mode=Mode.PRIVATE), bisect_by=cut_extrude13_end, keep=Keep.BOTH, mode=Mode.PRIVATE)
    add(cut_extrude13_tool1.solids().sort_by_distance((33.170248, 0, 49.069627))[0], mode=Mode.SUBTRACT)
    # Sketch31 → Cut-Extrude13 (cut, up to the surface)
    with BuildSketch(Plane(origin=(0, 0, 7.249003184), x_dir=(1, 0, 0), z_dir=(0, 1, 0)), mode=Mode.PRIVATE) as cut_extrude13_sk2:
        Polygon((-36.727591717, -51.765885066), (-26.055561267, -51.765885066), (-36.727591717, -21.930101014), align=None)
    cut_extrude13_tool2 = split(extrude(cut_extrude13_sk2.sketch, amount=CUT_EXTRUDE13_REACH, mode=Mode.PRIVATE), bisect_by=cut_extrude13_end, keep=Keep.BOTH, mode=Mode.PRIVATE)
    add(cut_extrude13_tool2.solids().sort_by_distance((-33.170248, 0, 49.069627))[0], mode=Mode.SUBTRACT)

    # Fillet2
    # the kernel refuses this chamfer: 5 mm, written as the material it takes off along each edge
    with BuildSketch(Plane(origin=(-5.247952216, -36.008288071, 82.5), x_dir=(-0.21436575688805004, -0.21436575688805004, -0.9529400004972123), z_dir=(-0.7071067811865476, 0.7071067811865476, 0))) as fillet2_piece_1:
        with BuildLine():
            Line((3.817710171, 0.118054313), (-1.269871725, -3.602259509))
            Line((-1.269871725, -3.602259509), (-1.365165725, -3.571943613))
            ThreePointArc((-1.365165725, -3.571943613), (-0.673980524, -1.78870847), (-0.095294, 0.030315896))
            Line((-0.095294, 0.030315896), (0, 0.1))
            ThreePointArc((0, 0.1), (1.908855085, 0.1), (3.817710171, 0.218054313))
            Line((3.817710171, 0.218054313), (3.817710171, 0.118054313))
        make_face()
    extrude(amount=23.340315788, mode=Mode.SUBTRACT)
    with BuildSketch(Plane(origin=(23.271310582, -29.256240287, 82.5), x_dir=(0, 1, 0), z_dir=(-1, 0, 0))) as fillet2_piece_2:
        with BuildLine():
            Line((4.506609807, -0.131372771), (-0.747807784, 4.446074029))
            Line((-0.747807784, 4.446074029), (-0.846864062, 4.432368055))
            ThreePointArc((-0.846864062, 4.432368055), (-0.407893681, 2.218333999), (-0.099056278, -0.013705975))
            Line((-0.099056278, -0.013705975), (0, -0.1))
            ThreePointArc((0, -0.1), (2.253304903, -0.1), (4.506609807, -0.231372771))
            Line((4.506609807, -0.231372771), (4.506609807, -0.131372771))
        make_face()
    extrude(amount=46.542621164, mode=Mode.SUBTRACT)
    with BuildSketch(Plane(origin=(21.752047784, -19.504192503, 82.5), x_dir=(-0.7071067811865475, 0.7071067811865475, -1.166012717588788e-14), z_dir=(-0.7071067811865476, -0.7071067811865476, 0))) as fillet2_piece_3:
        with BuildLine():
            Line((3.817710171, -0.118054313), (-1.269871725, 3.602259509))
            Line((-1.269871725, 3.602259509), (-1.365165725, 3.571943613))
            ThreePointArc((-1.365165725, 3.571943613), (-0.673980524, 1.78870847), (-0.095294, -0.030315896))
            Line((-0.095294, -0.030315896), (0, -0.1))
            ThreePointArc((0, -0.1), (1.908855085, -0.1), (3.817710171, -0.218054313))
            Line((3.817710171, -0.218054313), (3.817710171, -0.118054313))
        make_face()
    extrude(amount=23.340315788, mode=Mode.SUBTRACT)
    with BuildSketch(Plane(origin=(15, 1.961468954, 82.5), x_dir=(-1, 0, 0), z_dir=(0, -1, 0))) as fillet2_piece_4:
        with BuildLine():
            Line((3.685284533, -0.115169859), (-1.349627479, 3.43119394))
            Line((-1.349627479, 3.43119394), (-1.443785272, 3.397514421))
            ThreePointArc((-1.443785272, 3.397514421), (-0.714750834, 1.701311778), (-0.094157793, -0.033679518))
            Line((-0.094157793, -0.033679518), (0, -0.1))
            ThreePointArc((0, -0.1), (1.842642266, -0.1), (3.685284533, -0.215169859))
            Line((3.685284533, -0.215169859), (3.685284533, -0.115169859))
        make_face()
    extrude(amount=37.435418481, mode=Mode.SUBTRACT)
    with BuildSketch(Plane(origin=(-15, -35.473949528, 82.5), x_dir=(-0.33679518377841833, 0, -0.9415779331439652), z_dir=(0, 1, 0))) as fillet2_piece_5:
        with BuildLine():
            Line((3.685284533, 0.115169859), (-1.349627479, -3.43119394))
            Line((-1.349627479, -3.43119394), (-1.443785272, -3.397514421))
            ThreePointArc((-1.443785272, -3.397514421), (-0.714750834, -1.701311778), (-0.094157793, 0.033679518))
            Line((-0.094157793, 0.033679518), (0, 0.1))
            ThreePointArc((0, 0.1), (1.842642266, 0.1), (3.685284533, 0.215169859))
            Line((3.685284533, 0.215169859), (3.685284533, 0.115169859))
        make_face()
    extrude(amount=37.435418481, mode=Mode.SUBTRACT)
    with BuildSketch(Plane(origin=(-19.983321594, -12.239561881, 82.5), x_dir=(-0.39868992538477815, 0.39868992538477815, -0.8258890281347488), z_dir=(0.7071067811865476, 0.7071067811865476, 0))) as fillet2_piece_6:
        with BuildLine():
            Line((2.817444723, 0.093398854), (-1.665704554, -2.274235356))
            Line((-1.665704554, -2.274235356), (-1.748293456, -2.217852086))
            ThreePointArc((-1.748293456, -2.217852086), (-0.876872635, -1.107065072), (-0.082588903, 0.05638327))
            Line((-0.082588903, 0.05638327), (0, 0.1))
            ThreePointArc((0, 0.1), (1.408722362, 0.1), (2.817444723, 0.193398854))
            Line((2.817444723, 0.193398854), (2.817444723, 0.093398854))
        make_face()
    extrude(amount=18.337602655, mode=Mode.SUBTRACT)
    with BuildSketch(Plane(origin=(7.016678406, 0.727081307, 82.5), x_dir=(-0.7071067811865476, -0.7071067811865476, -1.61450741225738e-14), z_dir=(0.7071067811865476, -0.7071067811865476, 0))) as fillet2_piece_7:
        with BuildLine():
            Line((2.817444723, -0.093398854), (-1.665704554, 2.274235356))
            Line((-1.665704554, 2.274235356), (-1.748293456, 2.217852086))
            ThreePointArc((-1.748293456, 2.217852086), (-0.876872635, 1.107065072), (-0.082588903, -0.05638327))
            Line((-0.082588903, -0.05638327), (0, -0.1))
            ThreePointArc((0, -0.1), (1.408722362, -0.1), (2.817444723, -0.193398854))
            Line((2.817444723, -0.193398854), (2.817444723, -0.093398854))
        make_face()
    extrude(amount=18.337602655, mode=Mode.SUBTRACT)
    with BuildSketch(Plane(origin=(-19.204926804, -4.256240287, 82.5), x_dir=(0, -1, 0), z_dir=(1, 0, 0))) as fillet2_piece_8:
        with BuildLine():
            Line((2.880399513, -0.095151916), (-1.656094682, 2.358623676))
            Line((-1.656094682, 2.358623676), (-1.739787962, 2.303893112))
            ThreePointArc((-1.739787962, 2.303893112), (-0.871922742, 1.150619864), (-0.083693281, -0.054730565))
            Line((-0.083693281, -0.054730565), (0, -0.1))
            ThreePointArc((0, -0.1), (1.440199756, -0.1), (2.880399513, -0.195151916))
            Line((2.880399513, -0.195151916), (2.880399513, -0.095151916))
        make_face()
    extrude(amount=38.409853609, mode=Mode.SUBTRACT)

    # Chamfer2: one chamfer whose edges measure the first distance from different faces: ONE call of the kernel's chamfer builder (chamfer() names one face for all edges)
    chamfer2_edges_1 = [body_2_2_1.edges().sort_by_distance(p)[0] for p in [
        (27.491655911, 7.055292197, 55),
    ]]
    chamfer2_side_1 = [body_2_2_1.faces().sort_by_distance(p)[0] for p in [
        (31.959566033, 10.851213292, 42.509068474),
    ]]
    chamfer2_edges_2 = [body_2_2_1.edges().sort_by_distance(p)[0] for p in [
        (-27.491655911, 7.055292197, 55),
    ]]
    chamfer2_side_2 = [body_2_2_1.faces().sort_by_distance(p)[0] for p in [
        (-31.959566033, 10.851213292, 42.509068474),
    ]]
    chamfer2 = BRepFilletAPI_MakeChamfer(body_2_2_1.part.solid().wrapped)
    for e in chamfer2_edges_1:
        chamfer2.Add(CHAMFER2_SIZE, CHAMFER2_SIZE2, e.wrapped, chamfer2_side_1[0].wrapped)  # the first distance lies on this face
    for e in chamfer2_edges_2:
        chamfer2.Add(CHAMFER2_SIZE, CHAMFER2_SIZE2, e.wrapped, chamfer2_side_2[0].wrapped)  # the first distance lies on this face
    add(Compound.cast(chamfer2.Shape()), mode=Mode.REPLACE)


solid = body_2_2_1.part
